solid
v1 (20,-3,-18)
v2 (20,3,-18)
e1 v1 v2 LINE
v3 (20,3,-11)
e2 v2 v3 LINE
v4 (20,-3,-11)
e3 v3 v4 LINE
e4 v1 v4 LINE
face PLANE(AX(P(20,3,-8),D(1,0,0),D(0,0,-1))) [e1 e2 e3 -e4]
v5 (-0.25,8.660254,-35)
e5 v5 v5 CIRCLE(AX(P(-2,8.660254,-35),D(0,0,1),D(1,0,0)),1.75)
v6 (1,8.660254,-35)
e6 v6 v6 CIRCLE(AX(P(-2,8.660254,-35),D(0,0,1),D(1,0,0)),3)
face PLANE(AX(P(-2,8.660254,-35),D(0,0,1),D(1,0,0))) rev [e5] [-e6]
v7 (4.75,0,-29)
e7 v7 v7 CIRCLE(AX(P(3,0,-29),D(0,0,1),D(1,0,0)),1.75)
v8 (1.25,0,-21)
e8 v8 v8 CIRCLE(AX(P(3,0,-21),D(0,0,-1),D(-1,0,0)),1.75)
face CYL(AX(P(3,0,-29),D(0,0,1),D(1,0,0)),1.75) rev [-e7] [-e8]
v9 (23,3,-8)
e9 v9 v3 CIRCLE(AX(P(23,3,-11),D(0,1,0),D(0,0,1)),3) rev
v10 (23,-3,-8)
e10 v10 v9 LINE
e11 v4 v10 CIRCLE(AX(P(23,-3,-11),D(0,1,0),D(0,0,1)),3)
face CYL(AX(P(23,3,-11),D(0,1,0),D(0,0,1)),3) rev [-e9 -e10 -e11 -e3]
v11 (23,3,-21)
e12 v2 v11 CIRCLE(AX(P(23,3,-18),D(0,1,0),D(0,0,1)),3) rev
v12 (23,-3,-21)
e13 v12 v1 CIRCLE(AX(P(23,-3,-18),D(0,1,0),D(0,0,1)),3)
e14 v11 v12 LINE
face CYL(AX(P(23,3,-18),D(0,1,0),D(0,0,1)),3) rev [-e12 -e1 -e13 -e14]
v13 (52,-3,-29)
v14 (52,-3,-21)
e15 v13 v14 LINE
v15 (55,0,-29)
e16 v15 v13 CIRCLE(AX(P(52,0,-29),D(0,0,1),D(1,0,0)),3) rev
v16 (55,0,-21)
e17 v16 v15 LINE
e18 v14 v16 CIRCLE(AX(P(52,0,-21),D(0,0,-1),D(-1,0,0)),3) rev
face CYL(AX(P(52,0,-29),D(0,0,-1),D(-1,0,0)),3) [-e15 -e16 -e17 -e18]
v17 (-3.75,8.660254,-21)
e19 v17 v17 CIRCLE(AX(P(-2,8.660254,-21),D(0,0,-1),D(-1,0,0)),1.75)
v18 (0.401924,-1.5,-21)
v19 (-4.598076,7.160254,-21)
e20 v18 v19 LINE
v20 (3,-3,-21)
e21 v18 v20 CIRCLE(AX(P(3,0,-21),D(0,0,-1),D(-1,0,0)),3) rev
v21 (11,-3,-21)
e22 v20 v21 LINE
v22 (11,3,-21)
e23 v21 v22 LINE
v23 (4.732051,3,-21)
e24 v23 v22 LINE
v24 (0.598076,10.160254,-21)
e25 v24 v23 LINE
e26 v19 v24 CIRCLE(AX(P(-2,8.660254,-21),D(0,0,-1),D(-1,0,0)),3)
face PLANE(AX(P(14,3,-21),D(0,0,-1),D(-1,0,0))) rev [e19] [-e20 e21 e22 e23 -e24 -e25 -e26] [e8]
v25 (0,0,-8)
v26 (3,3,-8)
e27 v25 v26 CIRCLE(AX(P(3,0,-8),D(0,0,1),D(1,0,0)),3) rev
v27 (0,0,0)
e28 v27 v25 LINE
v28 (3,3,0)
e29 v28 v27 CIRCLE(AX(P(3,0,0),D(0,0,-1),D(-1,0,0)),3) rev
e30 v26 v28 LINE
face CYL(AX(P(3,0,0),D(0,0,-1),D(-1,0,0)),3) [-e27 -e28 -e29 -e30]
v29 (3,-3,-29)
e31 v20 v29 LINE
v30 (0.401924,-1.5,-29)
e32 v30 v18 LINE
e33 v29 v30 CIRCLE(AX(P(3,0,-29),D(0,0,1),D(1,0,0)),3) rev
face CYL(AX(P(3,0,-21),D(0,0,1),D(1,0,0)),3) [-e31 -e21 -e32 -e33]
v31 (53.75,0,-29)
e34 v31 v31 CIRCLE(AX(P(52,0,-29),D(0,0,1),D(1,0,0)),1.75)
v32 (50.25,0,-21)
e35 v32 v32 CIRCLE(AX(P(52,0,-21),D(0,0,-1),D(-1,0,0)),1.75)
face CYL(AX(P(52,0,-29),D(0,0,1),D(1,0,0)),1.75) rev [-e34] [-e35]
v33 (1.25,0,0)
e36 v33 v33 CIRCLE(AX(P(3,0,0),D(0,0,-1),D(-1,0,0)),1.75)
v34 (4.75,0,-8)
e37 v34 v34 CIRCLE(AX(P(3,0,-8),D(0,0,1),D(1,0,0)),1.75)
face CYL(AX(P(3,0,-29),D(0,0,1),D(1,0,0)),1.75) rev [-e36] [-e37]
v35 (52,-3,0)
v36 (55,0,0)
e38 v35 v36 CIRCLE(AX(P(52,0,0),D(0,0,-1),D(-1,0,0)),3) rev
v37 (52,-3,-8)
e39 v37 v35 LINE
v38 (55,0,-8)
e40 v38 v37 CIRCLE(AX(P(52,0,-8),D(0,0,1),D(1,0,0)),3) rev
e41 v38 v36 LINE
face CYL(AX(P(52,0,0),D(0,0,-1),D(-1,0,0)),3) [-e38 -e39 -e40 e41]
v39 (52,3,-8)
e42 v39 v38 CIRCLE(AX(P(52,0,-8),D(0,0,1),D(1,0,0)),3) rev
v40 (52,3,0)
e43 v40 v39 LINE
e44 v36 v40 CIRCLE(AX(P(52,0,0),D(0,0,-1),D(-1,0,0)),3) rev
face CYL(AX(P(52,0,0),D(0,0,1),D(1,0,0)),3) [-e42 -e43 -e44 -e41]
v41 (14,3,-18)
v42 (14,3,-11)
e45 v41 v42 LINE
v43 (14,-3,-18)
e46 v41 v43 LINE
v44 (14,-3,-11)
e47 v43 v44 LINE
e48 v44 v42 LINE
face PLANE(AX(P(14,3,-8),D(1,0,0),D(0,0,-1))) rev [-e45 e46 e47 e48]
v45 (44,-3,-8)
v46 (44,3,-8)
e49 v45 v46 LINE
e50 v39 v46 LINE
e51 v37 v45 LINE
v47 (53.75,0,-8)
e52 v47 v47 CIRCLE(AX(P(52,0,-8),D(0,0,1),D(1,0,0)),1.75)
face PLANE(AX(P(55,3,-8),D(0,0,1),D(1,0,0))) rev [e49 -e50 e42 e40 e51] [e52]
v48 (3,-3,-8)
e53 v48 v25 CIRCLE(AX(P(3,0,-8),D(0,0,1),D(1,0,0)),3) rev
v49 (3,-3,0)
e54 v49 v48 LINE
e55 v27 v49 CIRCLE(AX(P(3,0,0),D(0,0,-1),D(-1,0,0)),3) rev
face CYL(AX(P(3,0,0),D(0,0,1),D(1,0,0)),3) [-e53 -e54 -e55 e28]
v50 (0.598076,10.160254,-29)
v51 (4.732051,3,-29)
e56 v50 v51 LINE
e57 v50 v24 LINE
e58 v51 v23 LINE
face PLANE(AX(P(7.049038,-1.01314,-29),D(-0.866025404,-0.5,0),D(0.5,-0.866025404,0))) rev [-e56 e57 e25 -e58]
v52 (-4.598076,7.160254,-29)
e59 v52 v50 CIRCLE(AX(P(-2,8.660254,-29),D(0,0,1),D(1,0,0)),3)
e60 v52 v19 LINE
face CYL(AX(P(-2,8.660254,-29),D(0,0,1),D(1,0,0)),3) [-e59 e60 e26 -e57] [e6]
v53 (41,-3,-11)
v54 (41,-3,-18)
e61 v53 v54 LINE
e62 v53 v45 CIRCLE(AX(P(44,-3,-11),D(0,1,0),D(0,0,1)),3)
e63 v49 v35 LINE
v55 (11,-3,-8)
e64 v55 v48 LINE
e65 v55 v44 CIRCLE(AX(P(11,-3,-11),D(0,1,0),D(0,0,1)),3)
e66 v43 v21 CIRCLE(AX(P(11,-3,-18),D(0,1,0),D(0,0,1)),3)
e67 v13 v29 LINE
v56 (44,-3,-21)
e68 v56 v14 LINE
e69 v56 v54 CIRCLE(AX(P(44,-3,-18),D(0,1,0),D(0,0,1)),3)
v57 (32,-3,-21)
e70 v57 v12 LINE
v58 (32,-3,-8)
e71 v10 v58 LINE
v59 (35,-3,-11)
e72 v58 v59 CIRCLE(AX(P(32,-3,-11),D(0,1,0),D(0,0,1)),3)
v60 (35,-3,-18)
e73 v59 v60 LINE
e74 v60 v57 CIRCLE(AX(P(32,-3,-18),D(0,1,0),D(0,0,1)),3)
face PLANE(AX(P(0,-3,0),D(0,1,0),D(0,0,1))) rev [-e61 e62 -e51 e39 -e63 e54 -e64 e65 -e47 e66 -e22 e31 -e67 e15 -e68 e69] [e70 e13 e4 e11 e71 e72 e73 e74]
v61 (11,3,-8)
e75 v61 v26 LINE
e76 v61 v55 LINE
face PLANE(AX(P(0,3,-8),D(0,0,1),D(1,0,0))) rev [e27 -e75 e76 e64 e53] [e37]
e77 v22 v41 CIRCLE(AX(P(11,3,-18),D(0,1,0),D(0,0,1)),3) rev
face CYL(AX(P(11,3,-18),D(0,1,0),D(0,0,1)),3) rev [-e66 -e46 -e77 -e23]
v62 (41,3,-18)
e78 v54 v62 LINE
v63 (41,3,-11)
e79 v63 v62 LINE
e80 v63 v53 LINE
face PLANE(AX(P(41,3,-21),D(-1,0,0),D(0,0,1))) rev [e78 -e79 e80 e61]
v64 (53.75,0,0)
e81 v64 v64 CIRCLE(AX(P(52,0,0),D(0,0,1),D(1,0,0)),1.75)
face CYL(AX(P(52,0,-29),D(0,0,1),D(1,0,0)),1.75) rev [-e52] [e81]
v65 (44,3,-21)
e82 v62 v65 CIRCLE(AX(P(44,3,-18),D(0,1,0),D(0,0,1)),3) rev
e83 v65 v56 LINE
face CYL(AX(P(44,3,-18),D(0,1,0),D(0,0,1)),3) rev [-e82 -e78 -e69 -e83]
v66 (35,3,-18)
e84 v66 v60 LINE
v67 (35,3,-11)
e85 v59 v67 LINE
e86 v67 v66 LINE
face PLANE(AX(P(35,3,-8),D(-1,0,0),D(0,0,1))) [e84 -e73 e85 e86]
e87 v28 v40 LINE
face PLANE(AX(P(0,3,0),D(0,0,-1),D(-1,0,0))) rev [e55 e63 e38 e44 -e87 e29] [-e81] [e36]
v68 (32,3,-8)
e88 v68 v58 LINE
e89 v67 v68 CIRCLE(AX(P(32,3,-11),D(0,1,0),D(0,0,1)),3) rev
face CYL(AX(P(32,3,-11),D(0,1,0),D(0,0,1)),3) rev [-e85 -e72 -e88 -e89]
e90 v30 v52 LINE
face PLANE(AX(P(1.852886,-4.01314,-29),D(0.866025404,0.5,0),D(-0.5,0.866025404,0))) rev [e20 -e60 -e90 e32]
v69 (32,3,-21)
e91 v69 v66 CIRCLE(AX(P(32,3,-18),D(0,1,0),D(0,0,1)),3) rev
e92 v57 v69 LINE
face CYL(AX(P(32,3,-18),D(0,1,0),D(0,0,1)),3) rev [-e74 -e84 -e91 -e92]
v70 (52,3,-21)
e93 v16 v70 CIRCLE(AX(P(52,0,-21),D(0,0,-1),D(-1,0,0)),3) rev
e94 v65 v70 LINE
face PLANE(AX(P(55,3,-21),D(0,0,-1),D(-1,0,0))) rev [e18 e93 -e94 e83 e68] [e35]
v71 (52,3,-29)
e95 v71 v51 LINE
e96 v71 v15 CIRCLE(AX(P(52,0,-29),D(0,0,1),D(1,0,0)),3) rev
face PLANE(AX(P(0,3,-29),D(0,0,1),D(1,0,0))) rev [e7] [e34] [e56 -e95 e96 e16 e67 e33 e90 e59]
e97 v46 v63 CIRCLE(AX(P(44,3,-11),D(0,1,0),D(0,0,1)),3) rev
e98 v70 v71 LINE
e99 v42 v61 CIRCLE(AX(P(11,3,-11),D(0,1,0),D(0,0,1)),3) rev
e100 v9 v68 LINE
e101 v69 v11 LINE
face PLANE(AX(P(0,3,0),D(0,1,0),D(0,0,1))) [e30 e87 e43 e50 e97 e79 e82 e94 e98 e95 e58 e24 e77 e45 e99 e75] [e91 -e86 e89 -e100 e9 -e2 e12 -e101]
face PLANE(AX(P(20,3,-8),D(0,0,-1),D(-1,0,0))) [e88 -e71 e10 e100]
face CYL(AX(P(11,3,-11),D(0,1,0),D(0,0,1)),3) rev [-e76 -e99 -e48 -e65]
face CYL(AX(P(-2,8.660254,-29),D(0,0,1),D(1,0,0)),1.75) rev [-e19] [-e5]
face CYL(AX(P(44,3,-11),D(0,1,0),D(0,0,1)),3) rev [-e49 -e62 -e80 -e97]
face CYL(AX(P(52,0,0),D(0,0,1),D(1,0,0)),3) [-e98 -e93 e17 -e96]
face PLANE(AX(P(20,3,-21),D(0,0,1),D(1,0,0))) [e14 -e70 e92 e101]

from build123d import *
from build123d.topology import SkipClean

# Parameters (mm, degrees)
CROQUIS1_W                 = 15
CROQUIS1_H                 = 13
SALIENTE_EXTRUIR1_DEPTH    = 3
REDONDEO1_R                = 3
CORTAR_EXTRUIR1_DEPTH      = 63.24949799
CORTAR_EXTRUIR1_DEPTH_BACK = 63.24949799
CROQUIS2_R                 = 1.75
CORTAR_EXTRUIR2_DEPTH      = 63.24949799
CORTAR_EXTRUIR2_DEPTH_BACK = 63.24949799
CROQUIS3_R                 = 1.75
REDONDEO2_R                = 3
SALIENTE_EXTRUIR2_START    = -21
CROQUIS5_R                 = 1.75
SALIENTE_EXTRUIR2_DEPTH    = 8
SALIENTE_EXTRUIR3_START    = -29
CROQUIS6_R                 = 3
CROQUIS6_R_2               = 1.75
SALIENTE_EXTRUIR3_DEPTH    = 6


with BuildPart() as part:
    # Croquis1 → Saliente-Extruir1 (new, symmetric)
    with BuildSketch(Plane(origin=(0, 0, 0), x_dir=(1, 0, 0), z_dir=(0, 1, 0))):
        Polygon((0, 0), (0, 8), (14, 8), (14, 21), (0, 21), (0, 29), (55, 29), (55, 21), (41, 21), (41, 8), (55, 8), (55, 0), align=None)
        with Locations((27.5, 14.5)):
            Rectangle(CROQUIS1_W, CROQUIS1_H, mode=Mode.SUBTRACT)
    extrude(amount=SALIENTE_EXTRUIR1_DEPTH, both=True)

    # Redondeo1
    redondeo1_edges = [part.edges().sort_by_distance(p)[0] for p in [
        (0, -3, -4),
        (0, 3, -4),
        (0, -3, -25),
        (0, 3, -25),
        (55, -3, -4),
        (55, 3, -4),
        (55, 3, -25),
        (55, -3, -25),
    ]]
    fillet(redondeo1_edges, radius=REDONDEO1_R - 0.0001)  # a hair under: the kernel refuses the full size

    # Croquis2 → Cortar-Extruir1 (cut, two sides: drawn at the far end of the back side and taken through both)
    with BuildSketch(Plane.XY.offset(-CORTAR_EXTRUIR1_DEPTH_BACK)):
        with Locations((3, 0)):
            Circle(CROQUIS2_R)
    extrude(amount=CORTAR_EXTRUIR1_DEPTH + CORTAR_EXTRUIR1_DEPTH_BACK, mode=Mode.SUBTRACT)

    # Croquis3 → Cortar-Extruir2 (cut, two sides: drawn at the far end of the back side and taken through both)
    with BuildSketch(Plane.XY.offset(-CORTAR_EXTRUIR2_DEPTH_BACK)):
        with Locations((52, 0)):
            Circle(CROQUIS3_R)
    extrude(amount=CORTAR_EXTRUIR2_DEPTH + CORTAR_EXTRUIR2_DEPTH_BACK, mode=Mode.SUBTRACT)

    # Redondeo2
    redondeo2_edges = [part.edges().sort_by_distance(p)[0] for p in [
        (14, 0, -8),
        (14, 0, -21),
        (41, 0, -21),
        (41, 0, -8),
        (20, 0, -21),
        (20, 0, -8),
        (35, 0, -8),
        (35, 0, -21),
    ]]
    fillet(redondeo2_edges, radius=REDONDEO2_R)

    # Croquis5 → Saliente-Extruir2 (add)
    with BuildSketch(Plane.XY.offset(SALIENTE_EXTRUIR2_START)):
        with BuildLine():
            Line((0.598076211, 10.160254038), (5.598076211, 1.5))
            ThreePointArc((5.598076211, 1.5), (4.5, -2.598076211), (0.401923789, -1.5))
            Line((0.401923789, -1.5), (-4.598076211, 7.160254038))
            ThreePointArc((-4.598076211, 7.160254038), (-3.5, 11.258330249), (0.598076211, 10.160254038))
        make_face()
        with Locations(Location((-2, 8.660254038, 0), (0, 0, 180))):
            Circle(CROQUIS5_R, mode=Mode.SUBTRACT)
        with Locations((3, 0)):
            Circle(CROQUIS5_R, mode=Mode.SUBTRACT)
    extrude(amount=-SALIENTE_EXTRUIR2_DEPTH)

    # Croquis6 → Saliente-Extruir3 (add)
    with SkipClean():  # the faces are left unmerged after this step: merging them gives an invalid solid
        with BuildSketch(Plane.XY.offset(SALIENTE_EXTRUIR3_START)):
            with Locations((-2, 8.660254038)):
                Circle(CROQUIS6_R)
            with Locations((-2, 8.660254038)):
                Circle(CROQUIS6_R_2, mode=Mode.SUBTRACT)
        extrude(amount=-SALIENTE_EXTRUIR3_DEPTH)


solid = part.part
